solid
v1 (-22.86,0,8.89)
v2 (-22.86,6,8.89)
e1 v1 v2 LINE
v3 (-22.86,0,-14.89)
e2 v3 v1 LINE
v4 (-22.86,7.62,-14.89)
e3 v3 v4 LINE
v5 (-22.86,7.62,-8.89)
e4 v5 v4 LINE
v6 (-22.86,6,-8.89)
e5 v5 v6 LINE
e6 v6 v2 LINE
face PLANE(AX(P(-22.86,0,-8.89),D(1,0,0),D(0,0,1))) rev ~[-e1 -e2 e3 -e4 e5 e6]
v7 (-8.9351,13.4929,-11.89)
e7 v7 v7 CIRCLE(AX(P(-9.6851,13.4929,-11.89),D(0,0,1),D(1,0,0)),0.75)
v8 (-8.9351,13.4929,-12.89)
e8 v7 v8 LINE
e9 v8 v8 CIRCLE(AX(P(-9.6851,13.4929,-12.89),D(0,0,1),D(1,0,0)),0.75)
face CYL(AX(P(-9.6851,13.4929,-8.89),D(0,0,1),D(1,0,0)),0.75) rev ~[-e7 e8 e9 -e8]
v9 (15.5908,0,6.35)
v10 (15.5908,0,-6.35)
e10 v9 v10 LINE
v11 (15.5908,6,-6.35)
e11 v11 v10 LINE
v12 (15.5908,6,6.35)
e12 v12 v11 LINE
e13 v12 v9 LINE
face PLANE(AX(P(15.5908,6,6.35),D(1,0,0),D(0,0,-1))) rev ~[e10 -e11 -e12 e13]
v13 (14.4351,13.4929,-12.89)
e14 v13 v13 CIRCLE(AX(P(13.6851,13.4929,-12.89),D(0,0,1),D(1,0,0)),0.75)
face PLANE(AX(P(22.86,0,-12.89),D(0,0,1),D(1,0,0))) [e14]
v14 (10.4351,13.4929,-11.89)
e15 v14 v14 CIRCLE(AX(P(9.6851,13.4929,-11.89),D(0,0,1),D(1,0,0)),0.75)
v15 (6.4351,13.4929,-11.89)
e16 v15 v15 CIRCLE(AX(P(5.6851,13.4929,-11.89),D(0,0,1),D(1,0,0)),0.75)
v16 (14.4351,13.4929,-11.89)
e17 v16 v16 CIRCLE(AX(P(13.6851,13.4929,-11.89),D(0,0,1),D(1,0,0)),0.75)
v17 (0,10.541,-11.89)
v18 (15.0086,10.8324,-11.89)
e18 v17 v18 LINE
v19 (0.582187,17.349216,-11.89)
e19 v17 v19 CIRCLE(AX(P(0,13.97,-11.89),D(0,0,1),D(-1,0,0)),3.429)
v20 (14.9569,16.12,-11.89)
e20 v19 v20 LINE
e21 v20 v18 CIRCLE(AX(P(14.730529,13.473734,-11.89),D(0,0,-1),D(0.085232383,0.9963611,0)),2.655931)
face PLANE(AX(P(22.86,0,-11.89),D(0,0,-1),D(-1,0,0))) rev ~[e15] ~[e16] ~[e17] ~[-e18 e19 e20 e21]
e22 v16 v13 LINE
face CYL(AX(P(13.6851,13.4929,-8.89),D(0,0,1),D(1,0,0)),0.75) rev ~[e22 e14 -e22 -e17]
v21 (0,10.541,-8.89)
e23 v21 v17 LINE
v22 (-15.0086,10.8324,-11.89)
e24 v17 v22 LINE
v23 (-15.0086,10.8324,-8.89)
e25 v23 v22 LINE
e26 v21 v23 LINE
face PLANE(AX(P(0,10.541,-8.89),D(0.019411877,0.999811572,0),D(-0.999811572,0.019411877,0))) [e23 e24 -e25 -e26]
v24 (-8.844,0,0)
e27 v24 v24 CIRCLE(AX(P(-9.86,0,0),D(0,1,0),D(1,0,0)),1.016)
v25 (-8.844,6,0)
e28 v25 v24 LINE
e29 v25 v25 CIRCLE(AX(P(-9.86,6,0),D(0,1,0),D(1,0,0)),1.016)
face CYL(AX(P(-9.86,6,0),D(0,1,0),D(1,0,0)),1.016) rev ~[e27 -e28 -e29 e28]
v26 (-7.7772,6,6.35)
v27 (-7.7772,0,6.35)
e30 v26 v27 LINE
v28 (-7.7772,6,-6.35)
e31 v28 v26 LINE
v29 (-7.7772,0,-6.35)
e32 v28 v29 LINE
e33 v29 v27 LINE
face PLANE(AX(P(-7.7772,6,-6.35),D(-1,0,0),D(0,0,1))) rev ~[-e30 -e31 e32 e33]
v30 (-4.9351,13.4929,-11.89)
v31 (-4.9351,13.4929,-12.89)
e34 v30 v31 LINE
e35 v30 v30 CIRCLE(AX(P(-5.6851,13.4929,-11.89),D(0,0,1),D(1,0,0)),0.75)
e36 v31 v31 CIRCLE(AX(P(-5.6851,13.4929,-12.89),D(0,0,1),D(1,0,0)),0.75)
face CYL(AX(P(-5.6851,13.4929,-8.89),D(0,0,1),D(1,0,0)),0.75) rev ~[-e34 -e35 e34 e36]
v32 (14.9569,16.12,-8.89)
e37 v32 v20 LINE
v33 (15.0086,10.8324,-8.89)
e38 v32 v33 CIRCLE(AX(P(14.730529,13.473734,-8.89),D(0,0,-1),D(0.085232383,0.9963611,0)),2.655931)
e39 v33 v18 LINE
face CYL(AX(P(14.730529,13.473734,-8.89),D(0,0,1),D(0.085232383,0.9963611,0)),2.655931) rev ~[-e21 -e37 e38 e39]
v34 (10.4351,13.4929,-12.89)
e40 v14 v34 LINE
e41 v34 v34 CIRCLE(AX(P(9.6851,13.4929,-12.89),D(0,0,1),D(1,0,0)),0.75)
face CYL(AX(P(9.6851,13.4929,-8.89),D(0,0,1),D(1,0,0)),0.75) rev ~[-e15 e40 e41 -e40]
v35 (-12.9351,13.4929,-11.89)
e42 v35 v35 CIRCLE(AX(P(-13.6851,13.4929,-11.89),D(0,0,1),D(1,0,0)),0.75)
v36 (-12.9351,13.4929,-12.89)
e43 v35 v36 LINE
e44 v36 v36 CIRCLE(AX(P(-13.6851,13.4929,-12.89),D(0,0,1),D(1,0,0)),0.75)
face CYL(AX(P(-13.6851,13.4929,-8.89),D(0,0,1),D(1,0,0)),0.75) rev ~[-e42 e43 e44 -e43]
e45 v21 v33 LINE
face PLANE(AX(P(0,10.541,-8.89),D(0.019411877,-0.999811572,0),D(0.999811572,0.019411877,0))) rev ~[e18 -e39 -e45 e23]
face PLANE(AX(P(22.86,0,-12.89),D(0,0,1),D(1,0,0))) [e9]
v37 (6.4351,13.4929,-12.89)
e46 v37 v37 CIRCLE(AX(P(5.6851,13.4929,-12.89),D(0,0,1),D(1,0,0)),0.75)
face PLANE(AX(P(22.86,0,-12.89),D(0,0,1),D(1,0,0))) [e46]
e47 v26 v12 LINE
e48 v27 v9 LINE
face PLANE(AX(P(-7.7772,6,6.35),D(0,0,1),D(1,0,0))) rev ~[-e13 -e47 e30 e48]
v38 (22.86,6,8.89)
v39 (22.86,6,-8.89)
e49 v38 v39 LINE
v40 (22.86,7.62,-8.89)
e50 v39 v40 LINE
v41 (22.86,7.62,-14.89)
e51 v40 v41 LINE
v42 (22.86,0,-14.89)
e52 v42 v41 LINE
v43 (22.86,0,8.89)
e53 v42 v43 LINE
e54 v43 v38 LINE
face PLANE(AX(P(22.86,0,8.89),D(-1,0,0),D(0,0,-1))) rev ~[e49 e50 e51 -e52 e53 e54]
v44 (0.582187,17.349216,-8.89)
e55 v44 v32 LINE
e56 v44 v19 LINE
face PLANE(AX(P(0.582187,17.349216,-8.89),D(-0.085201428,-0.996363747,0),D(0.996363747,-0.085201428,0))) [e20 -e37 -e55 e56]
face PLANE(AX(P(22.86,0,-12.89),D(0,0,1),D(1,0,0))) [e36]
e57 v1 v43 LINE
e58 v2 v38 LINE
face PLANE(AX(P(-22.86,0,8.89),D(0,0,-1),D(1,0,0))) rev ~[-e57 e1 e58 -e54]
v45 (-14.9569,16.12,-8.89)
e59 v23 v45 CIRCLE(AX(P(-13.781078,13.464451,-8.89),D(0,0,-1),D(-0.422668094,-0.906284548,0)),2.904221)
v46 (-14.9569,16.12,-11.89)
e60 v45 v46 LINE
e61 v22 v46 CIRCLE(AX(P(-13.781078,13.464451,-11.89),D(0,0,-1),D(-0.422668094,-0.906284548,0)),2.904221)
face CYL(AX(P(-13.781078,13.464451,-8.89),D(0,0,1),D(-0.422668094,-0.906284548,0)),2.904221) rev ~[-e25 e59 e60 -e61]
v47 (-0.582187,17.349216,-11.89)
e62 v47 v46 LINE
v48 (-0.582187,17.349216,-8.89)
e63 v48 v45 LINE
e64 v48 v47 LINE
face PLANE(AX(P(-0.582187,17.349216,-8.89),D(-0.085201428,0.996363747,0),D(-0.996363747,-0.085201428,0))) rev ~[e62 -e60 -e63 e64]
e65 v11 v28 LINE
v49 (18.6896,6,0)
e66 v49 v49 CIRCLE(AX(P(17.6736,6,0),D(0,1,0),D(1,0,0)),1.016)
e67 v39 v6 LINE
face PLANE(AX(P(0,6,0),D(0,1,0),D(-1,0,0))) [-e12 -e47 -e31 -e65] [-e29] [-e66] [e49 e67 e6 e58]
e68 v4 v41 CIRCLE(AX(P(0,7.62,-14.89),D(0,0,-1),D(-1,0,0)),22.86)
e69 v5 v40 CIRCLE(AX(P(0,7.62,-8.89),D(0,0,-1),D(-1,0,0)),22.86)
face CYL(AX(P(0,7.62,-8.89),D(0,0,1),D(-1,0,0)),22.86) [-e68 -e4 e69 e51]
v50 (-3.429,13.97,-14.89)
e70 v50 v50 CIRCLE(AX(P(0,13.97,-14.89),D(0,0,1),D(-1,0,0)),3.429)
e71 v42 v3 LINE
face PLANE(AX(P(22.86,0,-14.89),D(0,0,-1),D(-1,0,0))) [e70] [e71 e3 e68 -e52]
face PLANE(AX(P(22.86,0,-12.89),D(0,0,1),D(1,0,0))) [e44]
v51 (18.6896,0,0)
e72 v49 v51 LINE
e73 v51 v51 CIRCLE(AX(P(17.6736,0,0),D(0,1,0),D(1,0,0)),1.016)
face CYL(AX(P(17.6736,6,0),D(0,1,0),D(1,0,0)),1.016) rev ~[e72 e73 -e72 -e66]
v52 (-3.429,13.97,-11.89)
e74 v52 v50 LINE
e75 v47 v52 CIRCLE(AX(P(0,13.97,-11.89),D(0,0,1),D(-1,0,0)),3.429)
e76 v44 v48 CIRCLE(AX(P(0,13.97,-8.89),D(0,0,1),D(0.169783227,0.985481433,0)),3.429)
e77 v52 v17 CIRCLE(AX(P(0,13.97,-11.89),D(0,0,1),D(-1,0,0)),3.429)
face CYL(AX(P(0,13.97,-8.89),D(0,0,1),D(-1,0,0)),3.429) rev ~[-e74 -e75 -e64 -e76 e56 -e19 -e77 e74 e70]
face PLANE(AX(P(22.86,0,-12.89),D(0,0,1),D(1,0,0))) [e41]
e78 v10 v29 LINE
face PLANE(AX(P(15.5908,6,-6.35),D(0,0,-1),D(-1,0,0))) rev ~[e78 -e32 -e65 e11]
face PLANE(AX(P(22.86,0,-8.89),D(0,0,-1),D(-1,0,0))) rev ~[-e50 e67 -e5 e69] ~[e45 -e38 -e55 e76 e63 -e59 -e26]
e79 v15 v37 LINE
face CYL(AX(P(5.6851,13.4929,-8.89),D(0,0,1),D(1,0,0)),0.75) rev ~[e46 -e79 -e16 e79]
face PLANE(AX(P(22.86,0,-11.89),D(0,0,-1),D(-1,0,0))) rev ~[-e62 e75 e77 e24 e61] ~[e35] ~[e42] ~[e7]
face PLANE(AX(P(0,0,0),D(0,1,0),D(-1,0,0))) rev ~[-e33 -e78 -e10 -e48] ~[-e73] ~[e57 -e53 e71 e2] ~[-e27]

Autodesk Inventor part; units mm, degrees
ref_plane "YZ Plane" through (0, 0, 0) normal (1, 0, 0) x (0, 1, 0)
ref_plane "XZ Plane" through (0, 0, 0) normal (0, 1, 0) x (-1, 0, 0)
ref_plane "XY Plane" through (0, 0, 0) normal (0, 0, 1) x (1, 0, 0)
sketch "Sketch1" plane through (0, 0, 0) normal (0, 1, 0) x (-1, 0, 0)
  line L0 (22.86, 8.89) -> (-22.86, 8.89)
  line L1 (-22.86, 8.89) -> (-22.86, -8.89)
  line L2 (-22.86, -8.89) -> (22.86, -8.89)
  line L3 (22.86, -8.89) -> (22.86, 8.89)
  point P0 (0, 0)
  point P1 (0, -8.89)
  point P2 (22.86, 0)
  dimension "d0" = 45.72
  dimension "d1" = 17.78
extrude "Extrusion1" add sketch "Sketch1" along normal blind 6
sketch "Sketch2" plane through (0, 6, 0) normal (0, 1, 0) x (1, 0, 0)
  line L0 (-7.7772, -6.35) -> (15.5908, -6.35)
  line L1 (15.5908, -6.35) -> (15.5908, 6.35)
  line L2 (15.5908, 6.35) -> (-7.7772, 6.35)
  line L3 (-7.7772, 6.35) -> (-7.7772, -6.35)
  circle A0 centre (-9.86, 0) radius 1.016
  circle A1 centre (17.6736, 0) radius 1.016
  line L4 (-22.86, 8.89) -> (-22.86, -8.89) projected
  line L5 (22.86, 8.89) -> (-22.86, 8.89) projected
  point P0 (3.9068, 0)
  point P1 (-7.7772, 0)
  point P2 (3.9068, 6.35)
  dimension "d4" = 23.368
  dimension "d5" = 12.7
  dimension "d6" = 2.032
  dimension "d7" = 2.032
  dimension "d8" = 2.0828
  dimension "d9" = 2.0828
  dimension "d34" = 13
  dimension "d35" = 2.54
extrude "Extrusion2" cut sketch "Sketch2" against normal blind 15
sketch "Sketch3" plane through (22.86, 0, -8.89) normal (0, 0, -1) x (-1, 0, 0)
  line L0 (0, 0) -> (45.72, 0) projected
  circle A0 centre (22.86, 13.97) radius 3.429
  line L1 (22.86, 17.399) -> (7.9031, 16.12)
  line L2 (22.86, 10.541) -> (7.8514, 10.8324)
  arc A1 (7.9031, 16.12) -> (7.8514, 10.8324) centre (8.1294, 13.4738) ccw
  arc A2 (37.8686, 10.8324) -> (37.8169, 16.12) centre (36.641, 13.4645) ccw
  line L3 (22.86, 17.399) -> (37.8169, 16.12)
  line L4 (22.86, 10.541) -> (37.8686, 10.8324)
  line L5 (45.72, 0) -> (45.72, 6) projected
  line L6 (45.72, 0) -> (45.72, 7.62)
  line L7 (0, 0) -> (0, 7.62)
  arc A3 (45.72, 7.62) -> (0, 7.62) centre (22.86, 7.62) ccw
  point P0 (22.86, 0)
  point P1 (22.7269, 10.5436)
  point P2 (22.9931, 10.5436)
  point P3 (22.2778, 17.3492)
  point P4 (23.4422, 17.3492)
  point P5 (22.86, 30.48)
  point P6 (39.5451, 13.4929)
  dimension "d14" = 6
  dimension "d15" = 6.858
  dimension "d25" = 7.62
  dimension "d30" = 6
  dimension "d31" = 16.51
  dimension "d33" = 13.781
extrude "Extrusion3" add sketch "Sketch3" along normal blind 3 contours A0 L1 L3 | L2 A1 L1 A0 | A0 L3 A2 L4 | L3 A0
extrude "Extrusion6" add sketch "Sketch3" along normal blind 6 contours L7 A3 L6 L5 L0 | A0 L1 L3 | L2 A1 L1 A0 | A0 L3 A2 L4 | A0 L1 | L3 A0
extrude "Extrusion4" cut sketch "Sketch3" along normal through all contours A0 L1 L3 | A0 L1 | L3 A0
extrude "Extrusion5" cut sketch "Sketch3" along normal blind 3 contours A0 L1 L3 | L2 A1 L1 A0 | A0 L3 A2 L4 | A0 L1 | L3 A0
sketch "Sketch4" plane through (22.86, 0, -8.89) normal (0, 0, 1) x (1, 0, 0)
  line L0 (-22.86, 19.9111) -> (-22.86, 7.8054)
  circle A0 centre (-32.5451, 13.4929) radius 0.75
  circle A1 centre (-36.5451, 13.4929) radius 0.75
  circle A2 centre (-28.5451, 13.4929) radius 0.75
  arc A3 (-37.8169, 16.12) -> (-37.8686, 10.8324) centre (-36.641, 13.4645) ccw projected
  circle A4 centre (-17.1749, 13.4929) radius 0.75
  circle A5 centre (-13.1749, 13.4929) radius 0.75
  circle A6 centre (-9.1749, 13.4929) radius 0.75
  point P0 (-22.86, 0)
  point P1 (-36.7619, 13.4929)
  point P2 (-39.5451, 13.4929)
  point P3 (-39.5451, 13.4929)
  point P4 (-9.079, 13.4645)
  dimension "d54" = 1.5
  dimension "d55" = 1.5
  dimension "d56" = 1.5
  dimension "d57" = 4
  dimension "d58" = 4
  dimension "d59" = 3
extrude "Extrusion7" cut sketch "Sketch4" against normal blind 4
properties part number "unions1s2"
